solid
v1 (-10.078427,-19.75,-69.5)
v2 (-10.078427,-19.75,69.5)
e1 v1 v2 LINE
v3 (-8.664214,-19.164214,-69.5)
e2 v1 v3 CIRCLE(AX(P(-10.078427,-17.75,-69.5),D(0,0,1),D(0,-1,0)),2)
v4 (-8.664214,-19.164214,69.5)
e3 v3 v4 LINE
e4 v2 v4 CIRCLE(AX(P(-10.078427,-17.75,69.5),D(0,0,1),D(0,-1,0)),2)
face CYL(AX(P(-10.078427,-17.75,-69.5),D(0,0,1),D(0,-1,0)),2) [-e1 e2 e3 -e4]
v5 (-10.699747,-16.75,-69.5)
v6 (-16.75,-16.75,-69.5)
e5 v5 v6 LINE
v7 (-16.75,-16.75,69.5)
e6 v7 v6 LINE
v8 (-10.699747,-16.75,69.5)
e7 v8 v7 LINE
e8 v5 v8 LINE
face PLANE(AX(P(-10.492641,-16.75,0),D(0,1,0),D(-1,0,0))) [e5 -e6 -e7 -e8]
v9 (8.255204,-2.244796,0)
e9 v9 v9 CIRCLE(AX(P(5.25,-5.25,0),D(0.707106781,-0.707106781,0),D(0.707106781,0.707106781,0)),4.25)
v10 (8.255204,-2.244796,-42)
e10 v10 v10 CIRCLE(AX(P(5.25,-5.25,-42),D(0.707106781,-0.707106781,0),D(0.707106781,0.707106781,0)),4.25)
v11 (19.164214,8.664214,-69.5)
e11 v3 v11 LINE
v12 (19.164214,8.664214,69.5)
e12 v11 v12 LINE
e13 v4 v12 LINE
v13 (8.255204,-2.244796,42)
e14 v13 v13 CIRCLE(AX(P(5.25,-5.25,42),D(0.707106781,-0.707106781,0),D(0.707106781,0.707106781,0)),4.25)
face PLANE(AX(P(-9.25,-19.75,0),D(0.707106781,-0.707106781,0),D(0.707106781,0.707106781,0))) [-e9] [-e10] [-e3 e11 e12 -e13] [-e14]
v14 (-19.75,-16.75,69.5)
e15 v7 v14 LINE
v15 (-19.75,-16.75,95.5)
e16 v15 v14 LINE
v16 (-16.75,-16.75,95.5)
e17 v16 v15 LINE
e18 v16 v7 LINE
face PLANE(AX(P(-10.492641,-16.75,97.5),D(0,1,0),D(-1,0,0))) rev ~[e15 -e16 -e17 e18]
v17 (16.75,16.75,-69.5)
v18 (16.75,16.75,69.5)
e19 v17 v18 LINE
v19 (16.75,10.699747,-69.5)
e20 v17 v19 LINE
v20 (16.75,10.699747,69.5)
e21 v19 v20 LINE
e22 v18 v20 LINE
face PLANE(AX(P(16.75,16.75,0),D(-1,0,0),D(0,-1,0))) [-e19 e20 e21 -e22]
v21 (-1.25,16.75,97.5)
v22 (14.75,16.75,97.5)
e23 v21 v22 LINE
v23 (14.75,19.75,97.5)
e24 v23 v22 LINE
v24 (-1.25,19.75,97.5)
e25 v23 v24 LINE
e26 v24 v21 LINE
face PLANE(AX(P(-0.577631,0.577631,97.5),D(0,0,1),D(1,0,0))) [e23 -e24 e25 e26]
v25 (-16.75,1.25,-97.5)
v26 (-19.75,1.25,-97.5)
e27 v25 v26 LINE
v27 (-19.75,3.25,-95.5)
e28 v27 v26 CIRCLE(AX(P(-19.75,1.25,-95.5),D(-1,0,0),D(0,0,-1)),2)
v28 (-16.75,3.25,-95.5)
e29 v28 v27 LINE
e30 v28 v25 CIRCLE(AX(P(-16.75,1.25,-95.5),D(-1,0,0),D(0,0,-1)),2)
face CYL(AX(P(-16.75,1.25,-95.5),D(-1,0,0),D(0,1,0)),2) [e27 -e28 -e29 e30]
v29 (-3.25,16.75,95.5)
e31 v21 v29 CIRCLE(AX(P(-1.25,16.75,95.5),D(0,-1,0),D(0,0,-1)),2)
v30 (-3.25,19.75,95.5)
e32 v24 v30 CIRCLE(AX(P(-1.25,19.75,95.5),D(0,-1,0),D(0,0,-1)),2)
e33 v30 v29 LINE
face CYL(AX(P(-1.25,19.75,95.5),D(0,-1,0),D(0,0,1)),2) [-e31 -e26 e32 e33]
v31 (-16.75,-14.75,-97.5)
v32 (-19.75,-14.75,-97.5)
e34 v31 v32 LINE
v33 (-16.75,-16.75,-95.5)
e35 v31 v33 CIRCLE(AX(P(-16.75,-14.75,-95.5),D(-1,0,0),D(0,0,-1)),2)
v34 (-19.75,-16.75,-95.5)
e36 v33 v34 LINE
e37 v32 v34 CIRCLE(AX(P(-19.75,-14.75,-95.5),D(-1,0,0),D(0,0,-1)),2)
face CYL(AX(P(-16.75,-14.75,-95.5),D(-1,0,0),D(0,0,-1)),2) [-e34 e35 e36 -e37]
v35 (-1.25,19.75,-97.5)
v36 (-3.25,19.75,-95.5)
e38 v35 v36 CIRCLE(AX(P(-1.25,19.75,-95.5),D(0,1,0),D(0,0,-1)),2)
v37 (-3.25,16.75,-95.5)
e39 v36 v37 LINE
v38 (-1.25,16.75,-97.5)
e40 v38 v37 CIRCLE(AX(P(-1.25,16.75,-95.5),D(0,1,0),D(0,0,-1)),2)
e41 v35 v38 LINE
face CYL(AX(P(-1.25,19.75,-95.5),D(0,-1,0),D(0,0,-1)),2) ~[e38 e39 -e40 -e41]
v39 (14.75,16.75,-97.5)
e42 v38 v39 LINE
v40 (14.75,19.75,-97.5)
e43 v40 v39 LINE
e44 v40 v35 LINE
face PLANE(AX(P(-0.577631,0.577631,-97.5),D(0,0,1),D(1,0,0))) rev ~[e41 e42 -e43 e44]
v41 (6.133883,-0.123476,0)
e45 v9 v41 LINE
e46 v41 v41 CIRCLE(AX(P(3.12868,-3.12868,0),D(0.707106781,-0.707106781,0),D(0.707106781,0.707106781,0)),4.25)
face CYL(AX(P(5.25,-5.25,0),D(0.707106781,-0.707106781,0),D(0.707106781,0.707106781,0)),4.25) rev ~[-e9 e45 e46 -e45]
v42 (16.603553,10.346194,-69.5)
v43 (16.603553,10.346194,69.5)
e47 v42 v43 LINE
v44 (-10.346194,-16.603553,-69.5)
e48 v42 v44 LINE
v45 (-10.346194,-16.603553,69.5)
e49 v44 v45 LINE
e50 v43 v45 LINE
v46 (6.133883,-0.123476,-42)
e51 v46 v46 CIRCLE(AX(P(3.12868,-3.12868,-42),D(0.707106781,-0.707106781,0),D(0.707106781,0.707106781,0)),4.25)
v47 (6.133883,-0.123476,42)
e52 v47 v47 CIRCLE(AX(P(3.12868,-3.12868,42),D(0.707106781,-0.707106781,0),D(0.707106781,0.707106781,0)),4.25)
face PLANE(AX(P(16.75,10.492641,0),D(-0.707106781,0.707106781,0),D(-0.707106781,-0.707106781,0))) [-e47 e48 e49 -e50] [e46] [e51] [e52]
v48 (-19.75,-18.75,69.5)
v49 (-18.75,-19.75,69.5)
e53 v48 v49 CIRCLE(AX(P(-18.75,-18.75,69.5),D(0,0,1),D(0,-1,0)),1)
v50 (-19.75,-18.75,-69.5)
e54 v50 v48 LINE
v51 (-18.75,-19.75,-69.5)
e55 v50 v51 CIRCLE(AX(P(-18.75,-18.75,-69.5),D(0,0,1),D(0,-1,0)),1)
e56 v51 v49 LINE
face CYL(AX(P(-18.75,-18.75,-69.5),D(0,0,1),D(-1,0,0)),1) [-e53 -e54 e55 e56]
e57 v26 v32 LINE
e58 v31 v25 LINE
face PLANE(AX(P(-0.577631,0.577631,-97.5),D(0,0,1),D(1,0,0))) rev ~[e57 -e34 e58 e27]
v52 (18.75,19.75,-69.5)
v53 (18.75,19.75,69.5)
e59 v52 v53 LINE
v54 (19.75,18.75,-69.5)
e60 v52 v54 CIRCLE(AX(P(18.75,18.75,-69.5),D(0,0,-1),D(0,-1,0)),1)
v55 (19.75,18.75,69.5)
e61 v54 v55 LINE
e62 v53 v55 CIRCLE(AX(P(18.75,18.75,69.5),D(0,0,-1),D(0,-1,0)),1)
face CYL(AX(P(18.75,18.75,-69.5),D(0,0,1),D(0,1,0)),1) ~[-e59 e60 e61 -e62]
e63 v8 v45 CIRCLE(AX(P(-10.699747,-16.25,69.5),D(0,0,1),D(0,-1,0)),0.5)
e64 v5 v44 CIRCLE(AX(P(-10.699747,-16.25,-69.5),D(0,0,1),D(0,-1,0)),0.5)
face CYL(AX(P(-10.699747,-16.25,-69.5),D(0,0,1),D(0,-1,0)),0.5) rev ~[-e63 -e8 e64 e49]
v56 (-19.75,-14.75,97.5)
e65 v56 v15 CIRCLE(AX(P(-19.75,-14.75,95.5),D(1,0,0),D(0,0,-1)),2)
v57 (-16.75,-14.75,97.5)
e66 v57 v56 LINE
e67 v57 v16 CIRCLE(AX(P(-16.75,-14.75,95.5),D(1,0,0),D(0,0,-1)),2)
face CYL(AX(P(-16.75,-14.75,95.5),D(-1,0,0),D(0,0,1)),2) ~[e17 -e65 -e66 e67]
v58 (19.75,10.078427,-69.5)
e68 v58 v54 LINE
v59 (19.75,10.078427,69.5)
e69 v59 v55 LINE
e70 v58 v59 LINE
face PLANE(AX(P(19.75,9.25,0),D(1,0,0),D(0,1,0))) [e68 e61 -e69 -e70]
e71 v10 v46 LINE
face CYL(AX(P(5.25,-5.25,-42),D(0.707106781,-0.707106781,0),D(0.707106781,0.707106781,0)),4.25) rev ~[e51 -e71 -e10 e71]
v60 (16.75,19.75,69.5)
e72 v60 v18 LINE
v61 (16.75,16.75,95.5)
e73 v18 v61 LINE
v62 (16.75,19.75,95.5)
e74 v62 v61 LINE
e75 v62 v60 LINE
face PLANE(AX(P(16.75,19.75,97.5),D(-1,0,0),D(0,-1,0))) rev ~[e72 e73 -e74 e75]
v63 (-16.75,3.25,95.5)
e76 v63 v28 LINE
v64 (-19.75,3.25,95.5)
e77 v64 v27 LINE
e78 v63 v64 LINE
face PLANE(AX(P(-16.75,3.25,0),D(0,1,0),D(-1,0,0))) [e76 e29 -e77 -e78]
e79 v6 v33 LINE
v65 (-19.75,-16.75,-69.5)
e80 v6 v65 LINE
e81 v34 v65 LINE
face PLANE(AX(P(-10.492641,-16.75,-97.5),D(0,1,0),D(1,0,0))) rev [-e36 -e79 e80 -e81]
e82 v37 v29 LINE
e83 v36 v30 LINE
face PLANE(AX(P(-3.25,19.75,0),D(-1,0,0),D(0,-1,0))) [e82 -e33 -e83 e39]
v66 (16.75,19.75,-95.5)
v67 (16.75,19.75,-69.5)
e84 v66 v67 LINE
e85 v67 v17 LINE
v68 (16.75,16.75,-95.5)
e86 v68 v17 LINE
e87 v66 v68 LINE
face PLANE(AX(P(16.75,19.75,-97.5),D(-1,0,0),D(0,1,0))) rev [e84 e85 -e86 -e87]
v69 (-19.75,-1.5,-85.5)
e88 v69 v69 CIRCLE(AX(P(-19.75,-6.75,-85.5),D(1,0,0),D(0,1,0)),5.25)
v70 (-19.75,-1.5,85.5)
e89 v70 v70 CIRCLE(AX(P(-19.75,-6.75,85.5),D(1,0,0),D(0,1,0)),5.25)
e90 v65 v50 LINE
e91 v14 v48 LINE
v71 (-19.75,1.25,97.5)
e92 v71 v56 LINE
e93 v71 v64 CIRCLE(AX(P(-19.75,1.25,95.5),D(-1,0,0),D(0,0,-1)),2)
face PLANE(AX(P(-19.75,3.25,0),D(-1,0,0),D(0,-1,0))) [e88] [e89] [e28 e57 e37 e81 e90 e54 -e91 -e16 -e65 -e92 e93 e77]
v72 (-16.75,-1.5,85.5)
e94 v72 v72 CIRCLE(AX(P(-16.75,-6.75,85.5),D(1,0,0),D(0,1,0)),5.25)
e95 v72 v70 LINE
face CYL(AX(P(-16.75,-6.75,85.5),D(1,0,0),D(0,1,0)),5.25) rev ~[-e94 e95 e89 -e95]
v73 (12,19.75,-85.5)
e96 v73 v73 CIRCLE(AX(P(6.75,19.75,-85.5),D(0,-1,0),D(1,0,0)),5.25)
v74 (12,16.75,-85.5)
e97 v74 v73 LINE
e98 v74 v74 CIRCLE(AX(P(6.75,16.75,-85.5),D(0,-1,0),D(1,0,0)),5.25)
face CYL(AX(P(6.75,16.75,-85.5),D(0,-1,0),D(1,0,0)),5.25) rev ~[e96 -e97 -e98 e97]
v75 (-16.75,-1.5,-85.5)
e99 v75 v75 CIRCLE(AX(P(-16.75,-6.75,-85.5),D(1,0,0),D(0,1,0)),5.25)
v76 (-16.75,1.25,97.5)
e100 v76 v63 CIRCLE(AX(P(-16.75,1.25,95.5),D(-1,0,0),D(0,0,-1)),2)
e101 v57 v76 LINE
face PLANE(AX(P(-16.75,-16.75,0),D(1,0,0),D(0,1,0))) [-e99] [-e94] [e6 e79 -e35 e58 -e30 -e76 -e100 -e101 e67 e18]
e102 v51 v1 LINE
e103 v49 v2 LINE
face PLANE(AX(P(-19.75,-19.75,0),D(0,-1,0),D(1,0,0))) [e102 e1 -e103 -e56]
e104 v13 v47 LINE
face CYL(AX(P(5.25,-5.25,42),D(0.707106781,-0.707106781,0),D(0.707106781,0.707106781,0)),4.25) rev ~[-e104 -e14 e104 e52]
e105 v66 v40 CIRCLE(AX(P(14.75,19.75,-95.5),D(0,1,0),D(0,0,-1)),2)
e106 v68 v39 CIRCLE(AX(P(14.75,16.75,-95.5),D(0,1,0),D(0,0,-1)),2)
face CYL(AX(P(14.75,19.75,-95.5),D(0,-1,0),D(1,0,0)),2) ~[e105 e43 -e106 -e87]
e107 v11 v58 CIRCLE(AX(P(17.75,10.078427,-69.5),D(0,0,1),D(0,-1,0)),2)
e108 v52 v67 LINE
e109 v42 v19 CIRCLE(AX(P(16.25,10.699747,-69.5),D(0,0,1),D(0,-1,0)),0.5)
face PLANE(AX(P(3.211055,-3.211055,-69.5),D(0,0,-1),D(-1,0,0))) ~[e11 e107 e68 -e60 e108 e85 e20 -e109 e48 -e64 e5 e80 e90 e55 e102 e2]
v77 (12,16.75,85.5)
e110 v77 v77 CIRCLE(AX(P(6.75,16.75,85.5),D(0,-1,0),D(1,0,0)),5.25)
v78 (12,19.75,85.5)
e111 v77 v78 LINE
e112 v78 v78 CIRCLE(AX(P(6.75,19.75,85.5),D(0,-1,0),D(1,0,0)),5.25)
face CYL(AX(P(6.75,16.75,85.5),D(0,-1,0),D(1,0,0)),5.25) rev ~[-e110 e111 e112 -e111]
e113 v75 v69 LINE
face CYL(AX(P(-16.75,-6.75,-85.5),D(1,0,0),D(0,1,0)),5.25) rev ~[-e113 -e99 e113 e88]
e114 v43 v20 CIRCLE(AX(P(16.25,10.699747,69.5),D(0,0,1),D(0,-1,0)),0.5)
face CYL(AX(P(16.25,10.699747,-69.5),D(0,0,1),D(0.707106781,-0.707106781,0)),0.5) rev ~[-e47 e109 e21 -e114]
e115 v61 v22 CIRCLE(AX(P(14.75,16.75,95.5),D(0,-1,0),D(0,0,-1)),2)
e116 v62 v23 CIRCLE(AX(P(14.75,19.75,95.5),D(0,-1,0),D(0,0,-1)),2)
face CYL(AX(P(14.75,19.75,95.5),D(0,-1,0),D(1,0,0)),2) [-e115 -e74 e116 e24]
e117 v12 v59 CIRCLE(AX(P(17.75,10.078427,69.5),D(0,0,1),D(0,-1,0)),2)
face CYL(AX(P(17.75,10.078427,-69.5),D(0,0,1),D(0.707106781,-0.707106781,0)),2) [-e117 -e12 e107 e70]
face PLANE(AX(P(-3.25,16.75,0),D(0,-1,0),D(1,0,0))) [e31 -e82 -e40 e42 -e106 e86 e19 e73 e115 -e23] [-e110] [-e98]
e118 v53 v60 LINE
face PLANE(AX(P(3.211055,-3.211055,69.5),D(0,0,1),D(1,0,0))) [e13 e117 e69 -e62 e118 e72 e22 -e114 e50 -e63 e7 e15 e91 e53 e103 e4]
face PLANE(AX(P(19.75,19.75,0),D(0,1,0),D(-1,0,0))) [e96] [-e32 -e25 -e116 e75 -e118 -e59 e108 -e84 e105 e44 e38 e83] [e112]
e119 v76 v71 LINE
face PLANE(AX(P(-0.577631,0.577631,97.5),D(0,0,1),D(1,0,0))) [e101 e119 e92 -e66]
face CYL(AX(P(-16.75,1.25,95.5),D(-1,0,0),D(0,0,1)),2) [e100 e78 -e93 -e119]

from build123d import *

# Parameters (mm, degrees)
F1_DEPTH = 97.5
F3_DEPTH = 28
F4_R     = 4.25
F5_DEPTH = 25
F6_R     = 5.25
F7_DEPTH = 25
F8_R     = 5.25
F9_DEPTH = 25
F10_R    = 2
F11_R    = 0.5
F12_R    = 1


# Not quite as in the source:
# - a pattern or mirror of a feature is missing from the dataset's text; its kind, count and spacing are read off the source's solid


with BuildPart() as f1:
    # F0 (on Top) → F1 (new body, symmetric)
    with BuildSketch(Plane.XY):
        Polygon((-19.75, 3.25), (-19.75, -19.75), (-9.25, -19.75), (19.75, 9.25), (19.75, 19.75), (-3.25, 19.75), (-3.25, 16.75), (16.75, 16.75), (16.75, 10.4926406871), (-10.4926406871, -16.75), (-16.75, -16.75), (-16.75, 3.25), align=None)
    extrude(amount=F1_DEPTH, both=True)

    # F2 (on face) → F3 (cut)
    with BuildSketch(Plane.XY.offset(97.5)):
        Polygon((-10.4926406871, -16.75), (-16.75, -16.75), (-19.75, -16.75), (-19.75, -19.75), (-9.25, -19.75), (19.75, 9.25), (19.75, 19.75), (16.75, 19.75), (16.75, 16.75), (16.75, 10.4926406871), align=None)
    f3 = extrude(amount=-F3_DEPTH, mode=Mode.SUBTRACT)

    # F3_copies: F3 across plane
    add(f3.mirror(Plane(origin=(0, 0, 0), x_dir=(-1, 0, 0), z_dir=(0, 0, -1))), mode=Mode.SUBTRACT)

    # F4 (on face) → F5 (cut)
    with BuildSketch(Plane(origin=(5.25, -5.25, 0), x_dir=(0.7071067812, 0.7071067812, 0), z_dir=(0.7071067812, -0.7071067812, 0))):
        with Locations((0, 42)):
            Circle(F4_R)
        with Locations((0, -42)):
            Circle(F4_R)
        Circle(F4_R)
    extrude(amount=-F5_DEPTH, mode=Mode.SUBTRACT)

    # F6 (on face) → F7 (cut)
    with BuildSketch(Plane.YZ.offset(-16.75)):
        with Locations((-6.75, 85.5)):
            Circle(F6_R)
        with Locations((-6.75, -85.5)):
            Circle(F6_R)
    extrude(amount=-F7_DEPTH, mode=Mode.SUBTRACT)

    # F8 (on face) → F9 (cut)
    with BuildSketch(Plane.XZ.offset(-16.75)):
        with Locations((6.75, 85.5)):
            Circle(F8_R)
        with Locations((6.75, -85.5)):
            Circle(F8_R)
    extrude(amount=-F9_DEPTH, mode=Mode.SUBTRACT)

    # F10
    f10_edges = [f1.edges().sort_by_distance(p)[0] for p in [
        (-9.25, -19.75, 0),
        (19.75, 9.25, 0),
        (-18.25, -16.75, 97.5),
        (-18.25, 3.25, 97.5),
        (-3.25, 18.25, 97.5),
        (16.75, 18.25, 97.5),
        (-18.25, 3.25, -97.5),
        (-3.25, 18.25, -97.5),
        (-18.25, -16.75, -97.5),
        (16.75, 18.25, -97.5),
    ]]
    fillet(f10_edges, radius=F10_R)

    # F11
    f11_edges = [f1.edges().sort_by_distance(p)[0] for p in [
        (16.75, 10.492641, 0),
        (-10.492641, -16.75, 0),
    ]]
    fillet(f11_edges, radius=F11_R)

    # F12
    f12_edges = [f1.edges().sort_by_distance(p)[0] for p in [
        (-19.75, -19.75, 0),
        (19.75, 19.75, 0),
    ]]
    fillet(f12_edges, radius=F12_R)


solid = f1.part
